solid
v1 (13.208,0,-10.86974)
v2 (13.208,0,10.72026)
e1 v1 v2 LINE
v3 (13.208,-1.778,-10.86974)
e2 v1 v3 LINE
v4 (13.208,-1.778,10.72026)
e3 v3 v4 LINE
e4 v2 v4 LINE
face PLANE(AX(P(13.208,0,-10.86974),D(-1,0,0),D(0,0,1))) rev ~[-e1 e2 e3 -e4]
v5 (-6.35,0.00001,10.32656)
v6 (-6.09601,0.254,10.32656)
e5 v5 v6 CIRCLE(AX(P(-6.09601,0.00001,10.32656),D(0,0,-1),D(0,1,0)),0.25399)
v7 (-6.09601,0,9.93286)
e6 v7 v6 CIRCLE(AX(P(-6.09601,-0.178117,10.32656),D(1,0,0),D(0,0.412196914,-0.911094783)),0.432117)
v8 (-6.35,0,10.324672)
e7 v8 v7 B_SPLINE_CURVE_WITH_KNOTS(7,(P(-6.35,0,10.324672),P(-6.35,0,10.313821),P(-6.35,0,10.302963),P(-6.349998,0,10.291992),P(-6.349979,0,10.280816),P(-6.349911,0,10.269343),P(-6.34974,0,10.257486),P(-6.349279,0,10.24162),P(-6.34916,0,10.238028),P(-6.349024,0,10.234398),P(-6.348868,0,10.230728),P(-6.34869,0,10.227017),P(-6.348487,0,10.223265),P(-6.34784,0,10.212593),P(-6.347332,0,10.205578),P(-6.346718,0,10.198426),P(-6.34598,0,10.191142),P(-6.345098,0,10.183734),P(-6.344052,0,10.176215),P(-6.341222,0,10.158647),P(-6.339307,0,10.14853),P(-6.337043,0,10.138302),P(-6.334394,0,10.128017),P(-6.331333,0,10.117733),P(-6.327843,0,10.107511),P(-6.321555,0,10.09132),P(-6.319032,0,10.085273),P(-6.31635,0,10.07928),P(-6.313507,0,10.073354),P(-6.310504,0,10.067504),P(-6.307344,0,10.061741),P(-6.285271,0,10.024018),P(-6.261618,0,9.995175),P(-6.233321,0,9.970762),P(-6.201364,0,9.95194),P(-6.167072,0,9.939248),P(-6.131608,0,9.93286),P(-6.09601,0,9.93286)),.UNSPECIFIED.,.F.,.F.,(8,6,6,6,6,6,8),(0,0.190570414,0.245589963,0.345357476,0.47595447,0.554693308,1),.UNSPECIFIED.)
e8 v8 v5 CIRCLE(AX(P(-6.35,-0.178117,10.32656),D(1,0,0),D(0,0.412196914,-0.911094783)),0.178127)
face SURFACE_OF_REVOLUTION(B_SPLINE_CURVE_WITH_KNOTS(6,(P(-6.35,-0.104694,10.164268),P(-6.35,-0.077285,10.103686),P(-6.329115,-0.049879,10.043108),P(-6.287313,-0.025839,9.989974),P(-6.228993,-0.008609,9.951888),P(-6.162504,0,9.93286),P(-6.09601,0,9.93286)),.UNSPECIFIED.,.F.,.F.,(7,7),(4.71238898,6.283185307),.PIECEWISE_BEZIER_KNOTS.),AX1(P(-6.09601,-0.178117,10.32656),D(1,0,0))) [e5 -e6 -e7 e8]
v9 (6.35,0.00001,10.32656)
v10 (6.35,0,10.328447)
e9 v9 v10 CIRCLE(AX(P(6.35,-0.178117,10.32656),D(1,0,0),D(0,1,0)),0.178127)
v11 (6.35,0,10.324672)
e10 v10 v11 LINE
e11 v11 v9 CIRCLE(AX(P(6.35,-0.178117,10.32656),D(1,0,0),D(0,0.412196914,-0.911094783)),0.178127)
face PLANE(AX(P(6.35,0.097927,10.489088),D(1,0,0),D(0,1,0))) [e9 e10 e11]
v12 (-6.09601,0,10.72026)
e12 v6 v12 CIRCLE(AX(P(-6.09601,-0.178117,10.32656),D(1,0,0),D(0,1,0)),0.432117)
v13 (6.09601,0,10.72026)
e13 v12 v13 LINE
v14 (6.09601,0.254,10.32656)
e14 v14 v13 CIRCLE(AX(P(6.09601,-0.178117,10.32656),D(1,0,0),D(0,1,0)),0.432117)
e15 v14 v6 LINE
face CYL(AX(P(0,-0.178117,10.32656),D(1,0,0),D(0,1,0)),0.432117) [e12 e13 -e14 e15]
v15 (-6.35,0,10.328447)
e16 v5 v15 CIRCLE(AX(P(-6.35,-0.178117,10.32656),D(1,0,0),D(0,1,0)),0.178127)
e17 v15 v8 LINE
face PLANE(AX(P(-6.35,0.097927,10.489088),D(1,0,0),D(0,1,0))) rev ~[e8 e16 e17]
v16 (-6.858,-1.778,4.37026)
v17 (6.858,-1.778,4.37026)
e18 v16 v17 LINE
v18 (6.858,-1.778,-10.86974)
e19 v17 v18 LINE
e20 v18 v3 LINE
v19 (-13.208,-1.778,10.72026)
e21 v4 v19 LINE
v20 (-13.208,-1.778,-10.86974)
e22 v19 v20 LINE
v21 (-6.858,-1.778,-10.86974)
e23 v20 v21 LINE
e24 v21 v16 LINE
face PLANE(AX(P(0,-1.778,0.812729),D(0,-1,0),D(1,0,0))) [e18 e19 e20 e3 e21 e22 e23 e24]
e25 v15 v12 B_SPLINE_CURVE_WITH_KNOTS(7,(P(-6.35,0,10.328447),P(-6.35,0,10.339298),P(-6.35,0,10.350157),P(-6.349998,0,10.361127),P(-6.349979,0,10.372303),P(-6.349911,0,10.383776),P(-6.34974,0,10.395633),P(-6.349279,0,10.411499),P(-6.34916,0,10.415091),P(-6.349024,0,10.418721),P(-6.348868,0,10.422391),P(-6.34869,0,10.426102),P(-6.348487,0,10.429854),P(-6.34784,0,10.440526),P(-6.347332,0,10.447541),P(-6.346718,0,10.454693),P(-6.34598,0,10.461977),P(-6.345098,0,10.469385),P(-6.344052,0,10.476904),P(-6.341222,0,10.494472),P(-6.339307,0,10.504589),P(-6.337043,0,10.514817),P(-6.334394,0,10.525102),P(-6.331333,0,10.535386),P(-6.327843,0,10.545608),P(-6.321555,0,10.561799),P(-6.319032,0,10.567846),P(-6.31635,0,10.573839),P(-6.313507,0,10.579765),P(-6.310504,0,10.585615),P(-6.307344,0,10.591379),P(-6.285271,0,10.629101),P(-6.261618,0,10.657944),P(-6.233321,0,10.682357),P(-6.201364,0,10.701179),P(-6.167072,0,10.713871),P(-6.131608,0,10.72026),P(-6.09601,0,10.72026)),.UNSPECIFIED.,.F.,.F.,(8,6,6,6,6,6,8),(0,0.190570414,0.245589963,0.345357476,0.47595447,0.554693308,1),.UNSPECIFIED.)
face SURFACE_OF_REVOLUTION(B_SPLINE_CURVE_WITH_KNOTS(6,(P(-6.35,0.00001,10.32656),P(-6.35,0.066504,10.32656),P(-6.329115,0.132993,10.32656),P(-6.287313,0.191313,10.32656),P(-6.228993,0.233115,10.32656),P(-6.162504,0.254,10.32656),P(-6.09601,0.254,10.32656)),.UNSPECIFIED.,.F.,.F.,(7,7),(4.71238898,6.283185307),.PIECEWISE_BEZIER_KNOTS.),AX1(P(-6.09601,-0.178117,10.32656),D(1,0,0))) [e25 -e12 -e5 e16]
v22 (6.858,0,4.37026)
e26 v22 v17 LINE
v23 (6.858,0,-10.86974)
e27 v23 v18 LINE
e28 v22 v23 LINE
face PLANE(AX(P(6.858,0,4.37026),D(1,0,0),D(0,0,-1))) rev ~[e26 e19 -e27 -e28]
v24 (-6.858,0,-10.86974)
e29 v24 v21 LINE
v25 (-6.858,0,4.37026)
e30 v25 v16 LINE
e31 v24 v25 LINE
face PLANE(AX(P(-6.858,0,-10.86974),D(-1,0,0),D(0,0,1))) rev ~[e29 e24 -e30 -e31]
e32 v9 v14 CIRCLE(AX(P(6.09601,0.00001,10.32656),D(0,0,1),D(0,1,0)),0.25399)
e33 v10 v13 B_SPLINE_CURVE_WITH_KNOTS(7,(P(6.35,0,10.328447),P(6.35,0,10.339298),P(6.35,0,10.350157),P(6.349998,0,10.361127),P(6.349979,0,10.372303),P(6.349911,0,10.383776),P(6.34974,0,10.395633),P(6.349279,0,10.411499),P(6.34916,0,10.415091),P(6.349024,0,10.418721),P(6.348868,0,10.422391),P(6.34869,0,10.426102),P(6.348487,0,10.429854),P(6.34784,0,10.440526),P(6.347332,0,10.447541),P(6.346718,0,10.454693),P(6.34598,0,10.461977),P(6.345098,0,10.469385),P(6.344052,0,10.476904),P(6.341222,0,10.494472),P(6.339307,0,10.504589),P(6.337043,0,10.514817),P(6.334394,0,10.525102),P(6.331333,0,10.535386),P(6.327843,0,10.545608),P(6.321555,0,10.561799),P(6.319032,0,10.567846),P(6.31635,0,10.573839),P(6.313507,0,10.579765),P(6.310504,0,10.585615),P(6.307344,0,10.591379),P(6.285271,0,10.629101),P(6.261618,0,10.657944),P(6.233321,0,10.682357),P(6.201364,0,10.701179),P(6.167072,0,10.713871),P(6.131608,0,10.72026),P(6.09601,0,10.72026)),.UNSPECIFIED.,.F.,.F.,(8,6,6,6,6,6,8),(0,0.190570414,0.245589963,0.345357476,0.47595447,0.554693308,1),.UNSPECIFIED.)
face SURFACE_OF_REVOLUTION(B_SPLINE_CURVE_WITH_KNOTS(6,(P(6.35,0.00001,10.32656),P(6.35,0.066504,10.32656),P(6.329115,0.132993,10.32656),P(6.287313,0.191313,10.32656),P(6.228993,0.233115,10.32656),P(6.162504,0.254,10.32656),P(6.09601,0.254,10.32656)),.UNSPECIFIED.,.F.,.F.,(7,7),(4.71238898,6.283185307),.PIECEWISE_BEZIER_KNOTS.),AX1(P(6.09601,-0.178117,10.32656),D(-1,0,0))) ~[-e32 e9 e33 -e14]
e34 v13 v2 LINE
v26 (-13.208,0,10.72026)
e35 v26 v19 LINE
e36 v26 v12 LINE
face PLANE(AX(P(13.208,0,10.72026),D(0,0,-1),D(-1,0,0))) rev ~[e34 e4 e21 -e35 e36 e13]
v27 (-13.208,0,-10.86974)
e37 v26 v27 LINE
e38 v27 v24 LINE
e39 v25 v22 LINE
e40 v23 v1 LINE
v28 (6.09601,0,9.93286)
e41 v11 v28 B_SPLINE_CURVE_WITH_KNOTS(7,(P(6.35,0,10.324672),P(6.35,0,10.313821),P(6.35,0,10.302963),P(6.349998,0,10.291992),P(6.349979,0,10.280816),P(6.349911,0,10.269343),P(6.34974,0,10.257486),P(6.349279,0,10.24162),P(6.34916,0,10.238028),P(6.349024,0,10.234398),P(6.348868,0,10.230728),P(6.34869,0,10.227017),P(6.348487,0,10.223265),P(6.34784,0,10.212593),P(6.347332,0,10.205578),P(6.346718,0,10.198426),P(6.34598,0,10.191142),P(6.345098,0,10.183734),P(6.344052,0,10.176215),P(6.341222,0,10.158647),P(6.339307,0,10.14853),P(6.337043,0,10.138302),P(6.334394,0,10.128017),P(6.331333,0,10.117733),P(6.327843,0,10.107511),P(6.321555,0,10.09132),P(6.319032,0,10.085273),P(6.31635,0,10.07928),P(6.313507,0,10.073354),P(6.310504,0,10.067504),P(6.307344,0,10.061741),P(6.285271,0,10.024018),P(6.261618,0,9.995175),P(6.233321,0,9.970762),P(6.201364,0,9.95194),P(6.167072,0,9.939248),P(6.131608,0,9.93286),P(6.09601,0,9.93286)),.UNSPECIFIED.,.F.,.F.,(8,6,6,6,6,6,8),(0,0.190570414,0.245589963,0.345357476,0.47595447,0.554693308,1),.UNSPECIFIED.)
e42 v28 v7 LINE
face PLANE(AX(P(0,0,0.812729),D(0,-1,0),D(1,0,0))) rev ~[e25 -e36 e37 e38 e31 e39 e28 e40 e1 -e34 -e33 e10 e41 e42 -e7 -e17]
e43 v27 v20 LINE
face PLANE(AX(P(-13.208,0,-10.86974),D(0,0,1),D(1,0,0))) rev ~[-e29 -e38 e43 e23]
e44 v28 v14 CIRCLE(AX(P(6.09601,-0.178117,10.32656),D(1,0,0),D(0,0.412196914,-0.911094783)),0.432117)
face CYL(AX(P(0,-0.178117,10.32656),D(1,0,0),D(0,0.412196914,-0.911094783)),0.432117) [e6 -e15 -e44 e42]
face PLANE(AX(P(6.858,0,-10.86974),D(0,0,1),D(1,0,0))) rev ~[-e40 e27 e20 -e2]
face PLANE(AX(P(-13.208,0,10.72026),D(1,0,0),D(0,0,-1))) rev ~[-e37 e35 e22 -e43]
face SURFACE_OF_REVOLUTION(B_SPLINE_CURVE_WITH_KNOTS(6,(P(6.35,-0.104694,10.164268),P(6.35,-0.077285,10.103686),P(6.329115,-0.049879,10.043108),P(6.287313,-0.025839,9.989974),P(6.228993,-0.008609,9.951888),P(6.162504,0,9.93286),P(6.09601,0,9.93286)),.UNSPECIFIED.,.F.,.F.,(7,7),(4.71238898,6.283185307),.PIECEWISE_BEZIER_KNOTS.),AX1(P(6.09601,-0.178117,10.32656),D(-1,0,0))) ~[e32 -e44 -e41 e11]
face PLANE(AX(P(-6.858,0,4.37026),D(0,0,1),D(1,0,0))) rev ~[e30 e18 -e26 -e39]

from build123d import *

# Parameters (mm, degrees)
F1_DEPTH = 1.778
F3_DEPTH = 6.35
F4_R     = 0.25399


# Not quite as in the source:
# - a fillet or chamfer is up to 0.001 mm smaller than in the source, because OpenCascade refuses the exact size


with BuildPart() as f1:
    # F0 (on Front) → F1 (new body)
    with BuildSketch(Plane.XZ):
        Polygon((-6.858, -10.8697404989), (-6.858, 4.3702595011), (0, 4.3702595011), (6.858, 4.3702595011), (6.858, -10.8697404989), (13.208, -10.8697404989), (13.208, 10.7202595011), (-13.208, 10.7202595011), (-13.208, -10.8697404989), align=None)
    extrude(amount=F1_DEPTH)

    # F2 (on Right) → F3 (join, symmetric)
    with BuildSketch(Plane.YZ):
        with BuildLine():
            ThreePointArc((0.254, 10.3265595011), (0.1849893869, 10.5608220088), (0, 10.7202595011))
            Line((0, 10.7202595011), (0, 10.3265595011))
            Line((0, 10.3265595011), (0.254, 10.3265595011))
        make_face()
        with BuildLine():
            Line((0.254, 10.3265595011), (0, 10.3265595011))
            Line((0, 10.3265595011), (0, 9.9328595011))
            ThreePointArc((0, 9.9328595011), (0.1849893869, 10.0922969934), (0.254, 10.3265595011))
        make_face()
    extrude(amount=F3_DEPTH, both=True)

    # F4 (radius 0.254 in the source; OpenCascade refuses exactly that, so slightly less here)
    f4_edges = [f1.edges().sort_by_distance(p)[0] for p in [
        (-6.35, 0.254, 10.32656),
        (6.35, 0.254, 10.32656),
    ]]
    fillet(f4_edges, radius=F4_R)


solid = f1.part
